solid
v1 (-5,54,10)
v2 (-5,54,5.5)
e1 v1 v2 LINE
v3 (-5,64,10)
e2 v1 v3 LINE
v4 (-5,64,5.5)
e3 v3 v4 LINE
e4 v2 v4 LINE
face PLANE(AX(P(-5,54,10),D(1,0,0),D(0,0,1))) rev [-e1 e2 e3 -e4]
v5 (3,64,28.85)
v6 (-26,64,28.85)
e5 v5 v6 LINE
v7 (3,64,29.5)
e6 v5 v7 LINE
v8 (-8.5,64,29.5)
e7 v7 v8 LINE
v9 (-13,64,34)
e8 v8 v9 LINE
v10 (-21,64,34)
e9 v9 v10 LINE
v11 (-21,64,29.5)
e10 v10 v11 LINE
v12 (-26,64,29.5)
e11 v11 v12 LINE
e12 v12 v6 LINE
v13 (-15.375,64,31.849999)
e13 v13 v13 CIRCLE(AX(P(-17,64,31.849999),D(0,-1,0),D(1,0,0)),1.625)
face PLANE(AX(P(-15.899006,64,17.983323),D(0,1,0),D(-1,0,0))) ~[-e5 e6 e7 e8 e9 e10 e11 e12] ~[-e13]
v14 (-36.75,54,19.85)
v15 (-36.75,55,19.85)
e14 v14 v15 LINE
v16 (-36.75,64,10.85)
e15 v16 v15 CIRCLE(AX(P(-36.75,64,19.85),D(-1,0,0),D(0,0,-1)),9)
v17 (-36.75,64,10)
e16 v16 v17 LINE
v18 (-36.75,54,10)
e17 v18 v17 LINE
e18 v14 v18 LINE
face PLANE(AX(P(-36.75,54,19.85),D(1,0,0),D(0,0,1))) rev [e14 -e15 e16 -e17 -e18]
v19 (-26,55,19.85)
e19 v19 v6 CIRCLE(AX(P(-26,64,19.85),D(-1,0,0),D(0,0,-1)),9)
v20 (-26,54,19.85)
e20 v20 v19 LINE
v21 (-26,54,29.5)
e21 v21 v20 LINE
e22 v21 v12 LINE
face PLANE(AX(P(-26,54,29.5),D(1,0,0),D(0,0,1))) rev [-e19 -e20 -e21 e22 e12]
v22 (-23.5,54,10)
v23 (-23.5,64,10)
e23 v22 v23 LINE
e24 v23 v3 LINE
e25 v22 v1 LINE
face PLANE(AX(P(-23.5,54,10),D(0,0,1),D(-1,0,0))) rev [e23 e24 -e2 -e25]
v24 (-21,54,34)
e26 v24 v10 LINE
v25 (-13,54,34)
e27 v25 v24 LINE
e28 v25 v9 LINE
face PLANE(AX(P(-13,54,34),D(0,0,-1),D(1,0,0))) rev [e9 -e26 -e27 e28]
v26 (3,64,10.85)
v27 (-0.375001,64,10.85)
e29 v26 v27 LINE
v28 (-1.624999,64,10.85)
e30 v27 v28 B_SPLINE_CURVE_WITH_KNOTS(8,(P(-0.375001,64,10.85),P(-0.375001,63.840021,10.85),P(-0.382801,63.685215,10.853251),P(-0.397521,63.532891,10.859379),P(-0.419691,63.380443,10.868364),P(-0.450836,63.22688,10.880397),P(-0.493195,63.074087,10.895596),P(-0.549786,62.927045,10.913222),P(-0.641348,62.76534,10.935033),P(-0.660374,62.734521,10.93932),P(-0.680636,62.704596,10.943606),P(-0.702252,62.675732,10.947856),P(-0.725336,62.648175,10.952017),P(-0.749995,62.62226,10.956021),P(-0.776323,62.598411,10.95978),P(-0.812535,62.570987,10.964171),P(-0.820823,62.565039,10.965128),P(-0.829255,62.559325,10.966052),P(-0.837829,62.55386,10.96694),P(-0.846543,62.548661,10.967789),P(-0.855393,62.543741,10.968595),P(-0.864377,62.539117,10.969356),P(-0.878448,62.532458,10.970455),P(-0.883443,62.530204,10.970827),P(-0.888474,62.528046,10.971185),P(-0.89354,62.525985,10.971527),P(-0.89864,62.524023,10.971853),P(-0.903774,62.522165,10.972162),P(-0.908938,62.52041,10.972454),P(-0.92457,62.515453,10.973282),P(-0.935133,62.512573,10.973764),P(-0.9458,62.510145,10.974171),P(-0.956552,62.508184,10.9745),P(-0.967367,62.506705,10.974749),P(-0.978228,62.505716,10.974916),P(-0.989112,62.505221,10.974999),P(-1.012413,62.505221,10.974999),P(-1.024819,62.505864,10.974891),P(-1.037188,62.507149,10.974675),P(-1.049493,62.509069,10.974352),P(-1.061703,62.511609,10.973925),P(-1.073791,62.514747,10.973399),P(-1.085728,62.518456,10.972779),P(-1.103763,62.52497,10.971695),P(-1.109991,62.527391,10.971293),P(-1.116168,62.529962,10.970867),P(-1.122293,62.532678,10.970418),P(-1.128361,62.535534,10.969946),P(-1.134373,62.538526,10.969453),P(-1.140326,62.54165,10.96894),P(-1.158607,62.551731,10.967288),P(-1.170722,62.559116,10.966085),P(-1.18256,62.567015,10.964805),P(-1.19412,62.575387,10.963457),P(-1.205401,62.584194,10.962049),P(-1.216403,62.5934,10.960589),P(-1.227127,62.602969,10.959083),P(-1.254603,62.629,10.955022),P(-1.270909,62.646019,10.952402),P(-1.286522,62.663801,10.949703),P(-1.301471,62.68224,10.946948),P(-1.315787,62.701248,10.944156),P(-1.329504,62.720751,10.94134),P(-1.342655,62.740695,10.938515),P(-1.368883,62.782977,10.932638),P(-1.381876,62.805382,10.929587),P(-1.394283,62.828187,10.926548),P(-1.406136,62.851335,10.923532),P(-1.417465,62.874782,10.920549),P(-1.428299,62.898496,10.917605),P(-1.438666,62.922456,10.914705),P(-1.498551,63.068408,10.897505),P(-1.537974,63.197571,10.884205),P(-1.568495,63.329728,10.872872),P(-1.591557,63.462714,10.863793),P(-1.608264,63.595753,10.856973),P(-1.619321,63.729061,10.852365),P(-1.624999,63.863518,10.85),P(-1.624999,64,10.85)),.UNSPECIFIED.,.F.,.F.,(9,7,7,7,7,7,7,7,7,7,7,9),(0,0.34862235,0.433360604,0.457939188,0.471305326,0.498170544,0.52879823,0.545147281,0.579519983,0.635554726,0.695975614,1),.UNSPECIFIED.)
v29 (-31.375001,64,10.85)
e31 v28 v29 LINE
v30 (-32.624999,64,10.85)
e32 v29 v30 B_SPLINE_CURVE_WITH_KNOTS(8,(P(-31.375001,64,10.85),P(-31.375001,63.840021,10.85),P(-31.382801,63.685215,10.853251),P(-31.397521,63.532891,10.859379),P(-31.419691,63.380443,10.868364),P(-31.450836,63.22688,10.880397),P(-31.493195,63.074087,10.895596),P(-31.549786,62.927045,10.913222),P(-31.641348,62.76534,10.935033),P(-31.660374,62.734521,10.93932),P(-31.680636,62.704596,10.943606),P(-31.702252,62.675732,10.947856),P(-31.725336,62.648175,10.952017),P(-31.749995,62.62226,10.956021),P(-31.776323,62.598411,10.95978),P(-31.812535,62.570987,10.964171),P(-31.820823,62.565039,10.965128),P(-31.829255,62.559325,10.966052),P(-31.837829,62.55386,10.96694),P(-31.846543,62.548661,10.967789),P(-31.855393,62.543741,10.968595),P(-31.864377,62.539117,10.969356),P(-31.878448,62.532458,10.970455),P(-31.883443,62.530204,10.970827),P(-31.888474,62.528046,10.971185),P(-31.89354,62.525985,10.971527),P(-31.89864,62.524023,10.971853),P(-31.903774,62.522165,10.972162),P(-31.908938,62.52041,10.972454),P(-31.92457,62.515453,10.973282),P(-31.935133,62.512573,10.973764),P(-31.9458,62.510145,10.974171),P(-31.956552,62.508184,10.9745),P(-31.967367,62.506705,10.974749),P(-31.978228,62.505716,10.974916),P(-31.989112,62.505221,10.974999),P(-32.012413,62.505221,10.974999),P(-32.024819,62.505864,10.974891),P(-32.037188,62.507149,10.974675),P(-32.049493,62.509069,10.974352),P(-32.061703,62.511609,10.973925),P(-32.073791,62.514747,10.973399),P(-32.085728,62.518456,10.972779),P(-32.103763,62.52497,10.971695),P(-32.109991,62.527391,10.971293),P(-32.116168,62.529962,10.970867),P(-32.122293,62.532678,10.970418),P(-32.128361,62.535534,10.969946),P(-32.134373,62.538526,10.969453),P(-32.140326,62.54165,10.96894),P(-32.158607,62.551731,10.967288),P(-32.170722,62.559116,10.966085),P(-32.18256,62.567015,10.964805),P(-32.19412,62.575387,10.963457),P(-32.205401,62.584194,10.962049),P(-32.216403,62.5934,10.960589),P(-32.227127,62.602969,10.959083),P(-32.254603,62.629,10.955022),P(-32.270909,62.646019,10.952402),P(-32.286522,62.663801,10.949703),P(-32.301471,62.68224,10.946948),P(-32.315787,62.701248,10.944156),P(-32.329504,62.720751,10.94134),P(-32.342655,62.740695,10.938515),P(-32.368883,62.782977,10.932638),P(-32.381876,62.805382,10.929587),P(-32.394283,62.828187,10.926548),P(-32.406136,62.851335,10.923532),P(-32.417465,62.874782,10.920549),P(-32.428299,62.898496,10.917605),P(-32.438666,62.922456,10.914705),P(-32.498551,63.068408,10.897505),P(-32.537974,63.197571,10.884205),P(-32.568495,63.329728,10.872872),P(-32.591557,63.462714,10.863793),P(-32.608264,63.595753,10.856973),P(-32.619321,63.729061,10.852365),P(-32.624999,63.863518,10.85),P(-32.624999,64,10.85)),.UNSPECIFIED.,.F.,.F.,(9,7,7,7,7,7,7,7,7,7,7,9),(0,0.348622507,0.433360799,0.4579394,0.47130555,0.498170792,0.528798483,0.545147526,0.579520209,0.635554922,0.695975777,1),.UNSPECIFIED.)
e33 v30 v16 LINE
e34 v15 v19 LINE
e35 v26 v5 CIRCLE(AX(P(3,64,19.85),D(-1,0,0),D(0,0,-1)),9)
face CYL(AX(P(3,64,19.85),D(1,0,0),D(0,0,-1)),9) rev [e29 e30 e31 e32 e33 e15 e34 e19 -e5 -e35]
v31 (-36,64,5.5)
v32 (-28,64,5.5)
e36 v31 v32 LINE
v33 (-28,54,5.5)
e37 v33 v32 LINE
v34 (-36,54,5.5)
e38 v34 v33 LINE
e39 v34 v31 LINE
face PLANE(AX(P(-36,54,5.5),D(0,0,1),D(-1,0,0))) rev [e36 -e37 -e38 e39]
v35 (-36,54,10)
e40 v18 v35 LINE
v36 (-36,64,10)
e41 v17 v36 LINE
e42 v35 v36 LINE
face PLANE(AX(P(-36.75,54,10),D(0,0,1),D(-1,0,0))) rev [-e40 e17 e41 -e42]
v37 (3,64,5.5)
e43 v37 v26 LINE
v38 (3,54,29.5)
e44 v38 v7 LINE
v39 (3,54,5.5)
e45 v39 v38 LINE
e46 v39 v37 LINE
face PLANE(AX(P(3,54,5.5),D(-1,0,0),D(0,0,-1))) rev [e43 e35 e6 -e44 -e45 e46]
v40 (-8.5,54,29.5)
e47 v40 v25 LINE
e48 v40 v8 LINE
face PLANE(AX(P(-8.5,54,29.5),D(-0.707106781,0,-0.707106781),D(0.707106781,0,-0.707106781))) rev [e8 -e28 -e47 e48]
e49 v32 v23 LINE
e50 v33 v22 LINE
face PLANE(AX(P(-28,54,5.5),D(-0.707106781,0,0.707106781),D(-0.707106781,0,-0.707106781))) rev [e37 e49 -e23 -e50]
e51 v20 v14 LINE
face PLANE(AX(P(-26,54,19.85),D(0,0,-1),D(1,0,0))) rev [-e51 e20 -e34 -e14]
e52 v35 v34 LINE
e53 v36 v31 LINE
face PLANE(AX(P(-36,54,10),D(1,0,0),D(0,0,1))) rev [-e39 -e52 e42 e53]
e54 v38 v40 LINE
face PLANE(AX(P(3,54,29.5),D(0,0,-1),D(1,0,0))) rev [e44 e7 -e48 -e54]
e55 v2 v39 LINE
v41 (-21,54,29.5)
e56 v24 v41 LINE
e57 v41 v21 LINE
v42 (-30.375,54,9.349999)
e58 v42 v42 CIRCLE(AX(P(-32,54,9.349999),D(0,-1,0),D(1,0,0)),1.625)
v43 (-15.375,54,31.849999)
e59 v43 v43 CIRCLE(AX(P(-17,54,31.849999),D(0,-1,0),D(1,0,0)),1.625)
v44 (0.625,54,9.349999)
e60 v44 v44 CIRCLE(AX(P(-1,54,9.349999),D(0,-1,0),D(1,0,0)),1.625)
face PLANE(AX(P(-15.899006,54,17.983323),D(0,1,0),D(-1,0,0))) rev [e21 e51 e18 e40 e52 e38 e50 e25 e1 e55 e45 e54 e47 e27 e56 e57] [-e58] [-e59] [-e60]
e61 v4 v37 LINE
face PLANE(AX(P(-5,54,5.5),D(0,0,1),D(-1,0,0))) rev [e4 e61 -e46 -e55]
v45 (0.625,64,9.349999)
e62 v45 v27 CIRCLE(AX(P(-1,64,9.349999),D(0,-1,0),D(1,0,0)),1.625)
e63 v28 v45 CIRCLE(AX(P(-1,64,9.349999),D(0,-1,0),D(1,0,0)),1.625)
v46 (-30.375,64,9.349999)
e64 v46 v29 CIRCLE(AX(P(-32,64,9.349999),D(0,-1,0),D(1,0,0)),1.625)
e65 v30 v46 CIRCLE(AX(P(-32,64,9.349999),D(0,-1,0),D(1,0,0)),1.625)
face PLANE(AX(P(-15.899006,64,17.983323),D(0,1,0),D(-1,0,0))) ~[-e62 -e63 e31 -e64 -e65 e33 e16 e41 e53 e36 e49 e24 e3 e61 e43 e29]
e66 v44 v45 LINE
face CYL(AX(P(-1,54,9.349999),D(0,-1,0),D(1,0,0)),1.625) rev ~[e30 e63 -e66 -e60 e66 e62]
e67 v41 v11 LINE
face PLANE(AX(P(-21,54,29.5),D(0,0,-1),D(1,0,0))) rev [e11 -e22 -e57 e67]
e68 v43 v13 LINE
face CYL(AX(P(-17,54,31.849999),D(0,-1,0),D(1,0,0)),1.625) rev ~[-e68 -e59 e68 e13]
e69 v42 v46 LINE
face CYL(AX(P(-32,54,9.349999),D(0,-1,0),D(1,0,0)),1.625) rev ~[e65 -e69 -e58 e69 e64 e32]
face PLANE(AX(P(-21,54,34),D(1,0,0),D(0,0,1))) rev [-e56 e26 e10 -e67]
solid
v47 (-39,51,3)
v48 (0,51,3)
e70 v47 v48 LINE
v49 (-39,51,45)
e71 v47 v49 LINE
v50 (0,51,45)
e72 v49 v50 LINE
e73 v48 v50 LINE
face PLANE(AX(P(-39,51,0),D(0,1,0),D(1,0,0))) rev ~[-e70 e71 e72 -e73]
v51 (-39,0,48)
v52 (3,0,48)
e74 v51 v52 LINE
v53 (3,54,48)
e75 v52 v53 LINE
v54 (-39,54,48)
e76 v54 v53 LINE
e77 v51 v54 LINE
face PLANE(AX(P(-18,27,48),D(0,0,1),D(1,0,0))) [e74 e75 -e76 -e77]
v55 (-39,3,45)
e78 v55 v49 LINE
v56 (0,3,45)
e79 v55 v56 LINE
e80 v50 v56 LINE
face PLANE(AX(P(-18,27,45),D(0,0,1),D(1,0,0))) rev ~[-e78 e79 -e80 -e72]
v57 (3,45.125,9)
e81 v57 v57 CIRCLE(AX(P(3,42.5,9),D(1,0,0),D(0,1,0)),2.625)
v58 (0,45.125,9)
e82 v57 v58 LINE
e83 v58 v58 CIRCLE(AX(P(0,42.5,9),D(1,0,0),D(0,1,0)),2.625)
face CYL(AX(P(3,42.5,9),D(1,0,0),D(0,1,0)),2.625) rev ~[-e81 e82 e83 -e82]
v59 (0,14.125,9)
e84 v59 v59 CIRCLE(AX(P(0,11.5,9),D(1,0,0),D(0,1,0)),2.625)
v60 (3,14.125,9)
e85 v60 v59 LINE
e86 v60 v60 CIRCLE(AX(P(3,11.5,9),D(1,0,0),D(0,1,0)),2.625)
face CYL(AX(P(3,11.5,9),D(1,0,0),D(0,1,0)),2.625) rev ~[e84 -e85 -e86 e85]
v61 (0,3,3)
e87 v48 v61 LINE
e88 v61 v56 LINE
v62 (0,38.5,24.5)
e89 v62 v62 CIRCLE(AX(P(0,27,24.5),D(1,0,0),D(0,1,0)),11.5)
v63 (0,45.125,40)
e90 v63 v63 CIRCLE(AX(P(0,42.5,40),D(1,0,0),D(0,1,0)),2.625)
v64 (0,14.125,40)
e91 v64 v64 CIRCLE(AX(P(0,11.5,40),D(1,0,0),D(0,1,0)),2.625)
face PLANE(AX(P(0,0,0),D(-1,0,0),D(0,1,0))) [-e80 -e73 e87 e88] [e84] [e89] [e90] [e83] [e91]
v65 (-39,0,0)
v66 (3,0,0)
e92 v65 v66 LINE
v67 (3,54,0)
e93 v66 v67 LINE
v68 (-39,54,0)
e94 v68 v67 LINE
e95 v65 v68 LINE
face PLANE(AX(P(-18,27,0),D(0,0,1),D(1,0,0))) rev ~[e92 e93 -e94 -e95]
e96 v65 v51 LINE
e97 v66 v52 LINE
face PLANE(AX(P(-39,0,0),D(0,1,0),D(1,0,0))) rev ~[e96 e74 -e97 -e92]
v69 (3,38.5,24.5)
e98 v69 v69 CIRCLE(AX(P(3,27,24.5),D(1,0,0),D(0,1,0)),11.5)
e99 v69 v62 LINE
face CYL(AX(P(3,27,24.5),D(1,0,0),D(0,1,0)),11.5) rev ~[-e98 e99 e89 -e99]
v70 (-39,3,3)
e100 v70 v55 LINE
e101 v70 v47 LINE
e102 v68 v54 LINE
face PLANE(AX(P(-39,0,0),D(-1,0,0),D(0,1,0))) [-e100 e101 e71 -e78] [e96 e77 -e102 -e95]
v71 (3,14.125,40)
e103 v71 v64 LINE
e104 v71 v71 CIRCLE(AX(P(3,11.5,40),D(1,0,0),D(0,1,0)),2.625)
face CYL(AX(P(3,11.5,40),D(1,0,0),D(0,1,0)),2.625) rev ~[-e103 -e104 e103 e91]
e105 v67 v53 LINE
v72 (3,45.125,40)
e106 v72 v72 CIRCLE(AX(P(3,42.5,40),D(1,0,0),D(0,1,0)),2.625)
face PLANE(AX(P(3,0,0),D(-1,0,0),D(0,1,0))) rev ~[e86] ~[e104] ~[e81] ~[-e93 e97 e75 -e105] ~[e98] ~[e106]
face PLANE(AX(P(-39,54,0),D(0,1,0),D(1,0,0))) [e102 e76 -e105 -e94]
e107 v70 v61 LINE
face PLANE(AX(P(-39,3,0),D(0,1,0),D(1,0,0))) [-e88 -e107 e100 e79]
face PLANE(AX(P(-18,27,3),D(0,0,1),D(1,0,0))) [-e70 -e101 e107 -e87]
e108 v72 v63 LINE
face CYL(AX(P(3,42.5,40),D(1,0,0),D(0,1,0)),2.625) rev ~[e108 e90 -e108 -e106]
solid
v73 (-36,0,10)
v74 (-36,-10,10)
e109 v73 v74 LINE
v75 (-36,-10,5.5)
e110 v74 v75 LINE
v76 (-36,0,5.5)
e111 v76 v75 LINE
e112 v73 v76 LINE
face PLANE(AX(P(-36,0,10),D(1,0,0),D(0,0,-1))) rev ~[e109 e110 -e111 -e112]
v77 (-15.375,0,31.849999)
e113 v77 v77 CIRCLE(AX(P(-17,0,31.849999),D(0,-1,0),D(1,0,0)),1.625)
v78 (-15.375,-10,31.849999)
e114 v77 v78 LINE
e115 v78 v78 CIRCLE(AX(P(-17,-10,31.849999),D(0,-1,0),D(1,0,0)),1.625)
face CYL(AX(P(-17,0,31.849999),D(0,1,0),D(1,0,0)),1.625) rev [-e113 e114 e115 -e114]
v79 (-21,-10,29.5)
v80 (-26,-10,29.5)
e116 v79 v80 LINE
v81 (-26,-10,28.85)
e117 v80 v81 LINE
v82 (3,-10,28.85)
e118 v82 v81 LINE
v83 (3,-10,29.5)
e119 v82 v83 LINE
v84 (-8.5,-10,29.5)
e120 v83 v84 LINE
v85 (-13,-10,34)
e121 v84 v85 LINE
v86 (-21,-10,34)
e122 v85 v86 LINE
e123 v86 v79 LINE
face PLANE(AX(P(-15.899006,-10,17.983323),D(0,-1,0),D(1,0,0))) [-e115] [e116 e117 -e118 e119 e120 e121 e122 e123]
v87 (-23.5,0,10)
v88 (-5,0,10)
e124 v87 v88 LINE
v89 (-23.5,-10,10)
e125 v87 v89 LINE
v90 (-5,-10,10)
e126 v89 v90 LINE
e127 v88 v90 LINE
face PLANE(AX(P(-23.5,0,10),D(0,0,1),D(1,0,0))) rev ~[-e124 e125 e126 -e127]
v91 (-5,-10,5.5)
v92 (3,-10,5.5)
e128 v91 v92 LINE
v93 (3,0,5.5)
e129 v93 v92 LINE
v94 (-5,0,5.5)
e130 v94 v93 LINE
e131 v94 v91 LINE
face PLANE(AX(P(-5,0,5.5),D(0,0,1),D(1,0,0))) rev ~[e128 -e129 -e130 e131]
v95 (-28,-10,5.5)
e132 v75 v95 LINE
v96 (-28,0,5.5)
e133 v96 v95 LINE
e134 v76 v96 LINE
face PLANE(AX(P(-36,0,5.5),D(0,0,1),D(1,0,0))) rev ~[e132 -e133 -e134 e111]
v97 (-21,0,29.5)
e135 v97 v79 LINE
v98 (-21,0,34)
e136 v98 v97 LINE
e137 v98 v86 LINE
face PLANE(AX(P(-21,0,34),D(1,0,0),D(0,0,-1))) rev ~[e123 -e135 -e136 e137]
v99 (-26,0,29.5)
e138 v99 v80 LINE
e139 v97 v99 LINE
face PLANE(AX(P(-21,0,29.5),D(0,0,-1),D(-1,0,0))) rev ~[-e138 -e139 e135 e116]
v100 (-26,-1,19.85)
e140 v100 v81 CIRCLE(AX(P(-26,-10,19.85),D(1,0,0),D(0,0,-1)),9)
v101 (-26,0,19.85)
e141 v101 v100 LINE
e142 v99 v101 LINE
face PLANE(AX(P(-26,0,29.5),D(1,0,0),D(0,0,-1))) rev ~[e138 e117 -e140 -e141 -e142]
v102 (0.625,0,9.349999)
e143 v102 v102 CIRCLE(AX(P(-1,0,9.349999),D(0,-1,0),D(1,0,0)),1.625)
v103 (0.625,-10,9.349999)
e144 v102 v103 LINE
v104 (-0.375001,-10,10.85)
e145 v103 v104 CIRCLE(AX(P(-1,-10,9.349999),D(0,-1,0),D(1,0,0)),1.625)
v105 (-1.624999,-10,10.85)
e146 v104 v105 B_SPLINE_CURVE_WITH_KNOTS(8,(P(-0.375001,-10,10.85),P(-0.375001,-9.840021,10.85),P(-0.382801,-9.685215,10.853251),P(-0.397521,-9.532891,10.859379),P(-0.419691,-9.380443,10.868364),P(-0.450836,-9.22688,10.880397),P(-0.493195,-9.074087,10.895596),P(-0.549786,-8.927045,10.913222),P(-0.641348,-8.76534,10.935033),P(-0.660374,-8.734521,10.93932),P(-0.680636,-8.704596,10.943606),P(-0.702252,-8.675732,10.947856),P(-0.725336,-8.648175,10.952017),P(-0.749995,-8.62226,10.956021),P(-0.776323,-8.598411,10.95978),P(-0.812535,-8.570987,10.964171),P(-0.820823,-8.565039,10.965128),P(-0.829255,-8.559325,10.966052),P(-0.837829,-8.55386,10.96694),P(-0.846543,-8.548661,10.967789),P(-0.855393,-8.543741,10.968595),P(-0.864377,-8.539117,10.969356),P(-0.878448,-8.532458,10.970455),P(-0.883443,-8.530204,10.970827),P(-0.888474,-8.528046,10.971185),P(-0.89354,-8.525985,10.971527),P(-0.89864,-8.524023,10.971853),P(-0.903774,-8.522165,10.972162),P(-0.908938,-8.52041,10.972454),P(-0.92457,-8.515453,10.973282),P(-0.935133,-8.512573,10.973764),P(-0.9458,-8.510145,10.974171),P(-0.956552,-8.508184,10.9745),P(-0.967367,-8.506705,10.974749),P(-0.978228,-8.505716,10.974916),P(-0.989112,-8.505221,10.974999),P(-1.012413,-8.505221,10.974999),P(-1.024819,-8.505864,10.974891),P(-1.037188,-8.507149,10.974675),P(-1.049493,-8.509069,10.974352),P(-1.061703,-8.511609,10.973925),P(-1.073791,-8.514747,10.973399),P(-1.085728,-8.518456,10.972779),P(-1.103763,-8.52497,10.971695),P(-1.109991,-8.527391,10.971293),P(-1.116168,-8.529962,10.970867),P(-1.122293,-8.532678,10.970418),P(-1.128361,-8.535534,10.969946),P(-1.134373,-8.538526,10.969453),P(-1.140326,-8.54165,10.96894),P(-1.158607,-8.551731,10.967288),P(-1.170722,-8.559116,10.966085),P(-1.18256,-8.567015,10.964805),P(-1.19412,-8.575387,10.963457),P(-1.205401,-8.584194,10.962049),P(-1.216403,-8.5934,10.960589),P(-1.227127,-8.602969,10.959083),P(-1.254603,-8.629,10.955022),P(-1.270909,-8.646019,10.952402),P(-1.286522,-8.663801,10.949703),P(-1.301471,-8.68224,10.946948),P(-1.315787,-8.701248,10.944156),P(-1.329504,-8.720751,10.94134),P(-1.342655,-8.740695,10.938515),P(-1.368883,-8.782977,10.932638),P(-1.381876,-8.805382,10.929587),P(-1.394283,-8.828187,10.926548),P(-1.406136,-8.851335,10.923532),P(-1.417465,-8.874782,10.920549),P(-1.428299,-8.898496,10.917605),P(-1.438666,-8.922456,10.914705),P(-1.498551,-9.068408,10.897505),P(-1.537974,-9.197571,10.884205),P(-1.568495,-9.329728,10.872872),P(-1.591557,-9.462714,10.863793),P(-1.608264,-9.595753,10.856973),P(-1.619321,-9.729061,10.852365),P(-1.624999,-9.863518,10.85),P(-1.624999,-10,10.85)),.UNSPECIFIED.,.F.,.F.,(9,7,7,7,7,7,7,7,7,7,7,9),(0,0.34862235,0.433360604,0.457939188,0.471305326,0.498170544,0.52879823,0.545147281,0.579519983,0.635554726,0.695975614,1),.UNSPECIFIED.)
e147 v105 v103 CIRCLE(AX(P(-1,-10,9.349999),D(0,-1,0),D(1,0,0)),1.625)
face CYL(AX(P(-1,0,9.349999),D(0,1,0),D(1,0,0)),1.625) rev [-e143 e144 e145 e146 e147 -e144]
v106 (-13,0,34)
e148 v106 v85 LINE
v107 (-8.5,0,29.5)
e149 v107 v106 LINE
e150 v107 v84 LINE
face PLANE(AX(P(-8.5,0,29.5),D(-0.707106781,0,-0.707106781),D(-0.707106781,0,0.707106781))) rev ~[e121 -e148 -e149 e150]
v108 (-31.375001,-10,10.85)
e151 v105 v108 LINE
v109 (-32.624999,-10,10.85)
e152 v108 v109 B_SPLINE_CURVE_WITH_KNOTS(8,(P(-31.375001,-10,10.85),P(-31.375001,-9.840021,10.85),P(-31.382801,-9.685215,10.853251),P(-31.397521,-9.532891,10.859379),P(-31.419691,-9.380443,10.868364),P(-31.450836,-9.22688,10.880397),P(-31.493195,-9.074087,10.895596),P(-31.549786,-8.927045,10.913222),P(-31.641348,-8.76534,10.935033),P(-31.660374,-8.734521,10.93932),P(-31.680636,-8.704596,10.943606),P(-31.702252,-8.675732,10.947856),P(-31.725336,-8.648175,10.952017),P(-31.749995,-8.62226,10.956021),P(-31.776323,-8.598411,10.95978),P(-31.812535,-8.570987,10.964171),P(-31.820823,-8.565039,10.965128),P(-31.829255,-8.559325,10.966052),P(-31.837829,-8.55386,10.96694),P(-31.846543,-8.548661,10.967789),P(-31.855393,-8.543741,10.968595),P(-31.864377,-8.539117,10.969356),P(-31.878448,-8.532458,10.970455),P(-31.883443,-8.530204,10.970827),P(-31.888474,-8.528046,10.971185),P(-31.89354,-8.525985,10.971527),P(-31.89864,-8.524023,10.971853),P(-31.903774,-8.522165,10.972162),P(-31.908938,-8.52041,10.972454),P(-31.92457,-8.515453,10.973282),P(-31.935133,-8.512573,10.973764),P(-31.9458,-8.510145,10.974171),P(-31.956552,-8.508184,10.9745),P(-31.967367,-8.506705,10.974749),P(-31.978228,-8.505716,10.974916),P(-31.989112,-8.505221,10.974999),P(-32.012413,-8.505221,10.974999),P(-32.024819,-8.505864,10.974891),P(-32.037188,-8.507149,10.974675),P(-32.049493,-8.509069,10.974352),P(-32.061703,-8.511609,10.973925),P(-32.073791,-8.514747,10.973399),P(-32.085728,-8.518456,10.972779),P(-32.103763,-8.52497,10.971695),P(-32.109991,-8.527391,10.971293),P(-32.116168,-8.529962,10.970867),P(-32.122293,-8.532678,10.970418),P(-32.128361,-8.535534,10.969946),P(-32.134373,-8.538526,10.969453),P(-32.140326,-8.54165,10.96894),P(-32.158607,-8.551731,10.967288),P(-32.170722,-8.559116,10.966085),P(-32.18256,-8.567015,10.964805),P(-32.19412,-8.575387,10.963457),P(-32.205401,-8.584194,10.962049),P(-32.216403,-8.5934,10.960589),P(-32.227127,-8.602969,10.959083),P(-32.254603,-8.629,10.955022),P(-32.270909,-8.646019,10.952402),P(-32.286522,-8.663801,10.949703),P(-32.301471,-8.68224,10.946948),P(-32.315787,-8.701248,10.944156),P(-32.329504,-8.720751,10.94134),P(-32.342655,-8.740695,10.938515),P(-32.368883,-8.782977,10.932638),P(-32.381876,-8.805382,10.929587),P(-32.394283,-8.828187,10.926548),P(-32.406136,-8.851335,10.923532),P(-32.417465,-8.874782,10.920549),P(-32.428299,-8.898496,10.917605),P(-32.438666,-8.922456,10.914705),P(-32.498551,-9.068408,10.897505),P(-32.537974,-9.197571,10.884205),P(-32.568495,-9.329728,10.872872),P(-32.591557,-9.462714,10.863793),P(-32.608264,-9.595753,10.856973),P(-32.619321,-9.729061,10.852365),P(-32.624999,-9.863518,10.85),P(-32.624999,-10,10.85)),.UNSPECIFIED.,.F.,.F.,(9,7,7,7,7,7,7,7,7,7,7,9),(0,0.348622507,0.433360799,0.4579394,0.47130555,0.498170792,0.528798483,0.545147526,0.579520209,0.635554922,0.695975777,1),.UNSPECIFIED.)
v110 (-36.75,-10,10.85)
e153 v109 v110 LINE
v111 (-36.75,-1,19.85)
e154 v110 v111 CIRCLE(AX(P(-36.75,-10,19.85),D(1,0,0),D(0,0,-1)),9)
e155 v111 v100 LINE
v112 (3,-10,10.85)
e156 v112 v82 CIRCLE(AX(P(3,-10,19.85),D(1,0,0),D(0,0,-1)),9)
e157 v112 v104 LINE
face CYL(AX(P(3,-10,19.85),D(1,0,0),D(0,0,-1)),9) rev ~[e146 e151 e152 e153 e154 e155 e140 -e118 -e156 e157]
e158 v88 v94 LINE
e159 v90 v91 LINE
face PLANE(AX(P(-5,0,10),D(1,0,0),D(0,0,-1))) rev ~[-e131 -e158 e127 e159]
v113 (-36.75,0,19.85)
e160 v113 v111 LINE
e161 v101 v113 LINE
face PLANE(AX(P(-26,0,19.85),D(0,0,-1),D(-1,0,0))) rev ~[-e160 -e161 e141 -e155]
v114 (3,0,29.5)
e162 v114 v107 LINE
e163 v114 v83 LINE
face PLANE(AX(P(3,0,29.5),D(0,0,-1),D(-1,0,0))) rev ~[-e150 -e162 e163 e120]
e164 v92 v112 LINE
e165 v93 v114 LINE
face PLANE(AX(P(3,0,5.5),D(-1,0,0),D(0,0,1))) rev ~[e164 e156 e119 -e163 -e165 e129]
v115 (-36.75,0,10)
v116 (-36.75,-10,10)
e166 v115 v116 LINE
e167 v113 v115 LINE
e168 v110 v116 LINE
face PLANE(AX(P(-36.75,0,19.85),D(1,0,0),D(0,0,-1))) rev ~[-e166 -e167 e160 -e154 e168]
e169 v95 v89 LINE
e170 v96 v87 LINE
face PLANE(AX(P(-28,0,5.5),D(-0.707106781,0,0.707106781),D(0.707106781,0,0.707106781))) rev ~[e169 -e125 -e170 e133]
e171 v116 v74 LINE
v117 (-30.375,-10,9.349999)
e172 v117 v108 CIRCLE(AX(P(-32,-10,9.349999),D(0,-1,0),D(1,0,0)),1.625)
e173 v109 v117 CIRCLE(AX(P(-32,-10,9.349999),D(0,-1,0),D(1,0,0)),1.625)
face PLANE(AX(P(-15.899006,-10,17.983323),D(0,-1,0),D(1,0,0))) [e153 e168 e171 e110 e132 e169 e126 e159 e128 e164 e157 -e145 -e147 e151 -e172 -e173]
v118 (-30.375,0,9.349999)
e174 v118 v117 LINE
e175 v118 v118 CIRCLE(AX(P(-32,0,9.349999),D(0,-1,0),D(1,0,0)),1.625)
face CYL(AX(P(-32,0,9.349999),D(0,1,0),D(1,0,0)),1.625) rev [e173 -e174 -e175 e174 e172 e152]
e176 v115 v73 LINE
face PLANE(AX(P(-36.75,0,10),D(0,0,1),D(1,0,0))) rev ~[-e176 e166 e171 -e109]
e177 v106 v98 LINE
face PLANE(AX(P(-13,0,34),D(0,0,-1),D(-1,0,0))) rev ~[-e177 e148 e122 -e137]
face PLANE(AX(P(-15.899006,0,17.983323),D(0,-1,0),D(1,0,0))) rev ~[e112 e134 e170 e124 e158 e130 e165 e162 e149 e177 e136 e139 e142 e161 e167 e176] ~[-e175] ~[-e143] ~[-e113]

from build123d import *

# Parameters (mm, degrees)
F0_R      = 1.625
F1_DEPTH  = 10
F3_DEPTH  = 39.751
F4_W      = 42
F4_H      = 54
F5_DEPTH  = 48
F6_T      = -3
F9_R      = 2.625
F9_R_2    = 11.5
F10_DEPTH = 42.001


with BuildPart() as f1:
    # F0 (on Front) → F1 (new body)
    with BuildSketch(Plane.XZ):
        Polygon((-5, 5.5), (3, 5.5), (3, 10), (3, 19.85), (3, 29.5), (-8.5, 29.5), (-13, 34), (-21, 34), (-21, 29.5), (-26, 29.5), (-26, 19.85), (-36.75, 19.85), (-36.75, 10), (-36, 10), (-36, 5.5), (-28, 5.5), (-23.5, 10), (-5, 10), align=None)
        with Locations((-32, 9.3499994636)):
            Circle(F0_R, mode=Mode.SUBTRACT)
        with Locations((-1, 9.3499994636)):
            Circle(F0_R, mode=Mode.SUBTRACT)
        with Locations((-17, 31.8499994636)):
            Circle(F0_R, mode=Mode.SUBTRACT)
    extrude(amount=F1_DEPTH)

    # F2 (on face) → F3 (cut, through all)
    with BuildSketch(Plane.YZ.offset(3)):
        with BuildLine():
            Line((-10.3440208091, 28.8434225789), (-10.3440208091, 10.8565774211))
            ThreePointArc((-10.3440208091, 10.8565774211), (-10.1720418405, 10.8516445055), (-10, 10.85))
            Line((-10, 10.85), (-10, 28.85))
            ThreePointArc((-10, 28.85), (-10.1720418405, 28.8483554945), (-10.3440208091, 28.8434225789))
        make_face()
        with BuildLine():
            Line((-10, 28.85), (-10, 10.85))
            ThreePointArc((-10, 10.85), (-1, 19.85), (-10, 28.85))
        make_face()
    extrude(amount=-F3_DEPTH, mode=Mode.SUBTRACT)


with BuildPart() as f5:
    # F4 (on Top) → F5 (new body)
    with BuildSketch(Plane.XY):
        with Locations((-18, 27)):
            Rectangle(F4_W, F4_H)
    extrude(amount=F5_DEPTH)

    # F6
    f6_openings = [f5.faces().sort_by_distance(p)[0] for p in [
        (-39, 27, 24),
    ]]
    offset(amount=F6_T, openings=f6_openings)

    # F9 (on face) → F10 (cut, through all)
    with BuildSketch(Plane.YZ.offset(3)):
        with Locations((11.5, 40)):
            Circle(F9_R)
        with Locations((27, 24.5)):
            Circle(F9_R_2)
        with Locations((11.5, 9)):
            Circle(F9_R)
        with Locations((42.5, 9)):
            Circle(F9_R)
        with Locations((42.5, 40)):
            Circle(F9_R)
    extrude(amount=-F10_DEPTH, mode=Mode.SUBTRACT)


with BuildPart() as f8_1:
    # F8: instance of F1
    add(f1.part.mirror(Plane.XZ.offset(-27)))


solid = Compound([f1.part, f5.part, f8_1.part])
